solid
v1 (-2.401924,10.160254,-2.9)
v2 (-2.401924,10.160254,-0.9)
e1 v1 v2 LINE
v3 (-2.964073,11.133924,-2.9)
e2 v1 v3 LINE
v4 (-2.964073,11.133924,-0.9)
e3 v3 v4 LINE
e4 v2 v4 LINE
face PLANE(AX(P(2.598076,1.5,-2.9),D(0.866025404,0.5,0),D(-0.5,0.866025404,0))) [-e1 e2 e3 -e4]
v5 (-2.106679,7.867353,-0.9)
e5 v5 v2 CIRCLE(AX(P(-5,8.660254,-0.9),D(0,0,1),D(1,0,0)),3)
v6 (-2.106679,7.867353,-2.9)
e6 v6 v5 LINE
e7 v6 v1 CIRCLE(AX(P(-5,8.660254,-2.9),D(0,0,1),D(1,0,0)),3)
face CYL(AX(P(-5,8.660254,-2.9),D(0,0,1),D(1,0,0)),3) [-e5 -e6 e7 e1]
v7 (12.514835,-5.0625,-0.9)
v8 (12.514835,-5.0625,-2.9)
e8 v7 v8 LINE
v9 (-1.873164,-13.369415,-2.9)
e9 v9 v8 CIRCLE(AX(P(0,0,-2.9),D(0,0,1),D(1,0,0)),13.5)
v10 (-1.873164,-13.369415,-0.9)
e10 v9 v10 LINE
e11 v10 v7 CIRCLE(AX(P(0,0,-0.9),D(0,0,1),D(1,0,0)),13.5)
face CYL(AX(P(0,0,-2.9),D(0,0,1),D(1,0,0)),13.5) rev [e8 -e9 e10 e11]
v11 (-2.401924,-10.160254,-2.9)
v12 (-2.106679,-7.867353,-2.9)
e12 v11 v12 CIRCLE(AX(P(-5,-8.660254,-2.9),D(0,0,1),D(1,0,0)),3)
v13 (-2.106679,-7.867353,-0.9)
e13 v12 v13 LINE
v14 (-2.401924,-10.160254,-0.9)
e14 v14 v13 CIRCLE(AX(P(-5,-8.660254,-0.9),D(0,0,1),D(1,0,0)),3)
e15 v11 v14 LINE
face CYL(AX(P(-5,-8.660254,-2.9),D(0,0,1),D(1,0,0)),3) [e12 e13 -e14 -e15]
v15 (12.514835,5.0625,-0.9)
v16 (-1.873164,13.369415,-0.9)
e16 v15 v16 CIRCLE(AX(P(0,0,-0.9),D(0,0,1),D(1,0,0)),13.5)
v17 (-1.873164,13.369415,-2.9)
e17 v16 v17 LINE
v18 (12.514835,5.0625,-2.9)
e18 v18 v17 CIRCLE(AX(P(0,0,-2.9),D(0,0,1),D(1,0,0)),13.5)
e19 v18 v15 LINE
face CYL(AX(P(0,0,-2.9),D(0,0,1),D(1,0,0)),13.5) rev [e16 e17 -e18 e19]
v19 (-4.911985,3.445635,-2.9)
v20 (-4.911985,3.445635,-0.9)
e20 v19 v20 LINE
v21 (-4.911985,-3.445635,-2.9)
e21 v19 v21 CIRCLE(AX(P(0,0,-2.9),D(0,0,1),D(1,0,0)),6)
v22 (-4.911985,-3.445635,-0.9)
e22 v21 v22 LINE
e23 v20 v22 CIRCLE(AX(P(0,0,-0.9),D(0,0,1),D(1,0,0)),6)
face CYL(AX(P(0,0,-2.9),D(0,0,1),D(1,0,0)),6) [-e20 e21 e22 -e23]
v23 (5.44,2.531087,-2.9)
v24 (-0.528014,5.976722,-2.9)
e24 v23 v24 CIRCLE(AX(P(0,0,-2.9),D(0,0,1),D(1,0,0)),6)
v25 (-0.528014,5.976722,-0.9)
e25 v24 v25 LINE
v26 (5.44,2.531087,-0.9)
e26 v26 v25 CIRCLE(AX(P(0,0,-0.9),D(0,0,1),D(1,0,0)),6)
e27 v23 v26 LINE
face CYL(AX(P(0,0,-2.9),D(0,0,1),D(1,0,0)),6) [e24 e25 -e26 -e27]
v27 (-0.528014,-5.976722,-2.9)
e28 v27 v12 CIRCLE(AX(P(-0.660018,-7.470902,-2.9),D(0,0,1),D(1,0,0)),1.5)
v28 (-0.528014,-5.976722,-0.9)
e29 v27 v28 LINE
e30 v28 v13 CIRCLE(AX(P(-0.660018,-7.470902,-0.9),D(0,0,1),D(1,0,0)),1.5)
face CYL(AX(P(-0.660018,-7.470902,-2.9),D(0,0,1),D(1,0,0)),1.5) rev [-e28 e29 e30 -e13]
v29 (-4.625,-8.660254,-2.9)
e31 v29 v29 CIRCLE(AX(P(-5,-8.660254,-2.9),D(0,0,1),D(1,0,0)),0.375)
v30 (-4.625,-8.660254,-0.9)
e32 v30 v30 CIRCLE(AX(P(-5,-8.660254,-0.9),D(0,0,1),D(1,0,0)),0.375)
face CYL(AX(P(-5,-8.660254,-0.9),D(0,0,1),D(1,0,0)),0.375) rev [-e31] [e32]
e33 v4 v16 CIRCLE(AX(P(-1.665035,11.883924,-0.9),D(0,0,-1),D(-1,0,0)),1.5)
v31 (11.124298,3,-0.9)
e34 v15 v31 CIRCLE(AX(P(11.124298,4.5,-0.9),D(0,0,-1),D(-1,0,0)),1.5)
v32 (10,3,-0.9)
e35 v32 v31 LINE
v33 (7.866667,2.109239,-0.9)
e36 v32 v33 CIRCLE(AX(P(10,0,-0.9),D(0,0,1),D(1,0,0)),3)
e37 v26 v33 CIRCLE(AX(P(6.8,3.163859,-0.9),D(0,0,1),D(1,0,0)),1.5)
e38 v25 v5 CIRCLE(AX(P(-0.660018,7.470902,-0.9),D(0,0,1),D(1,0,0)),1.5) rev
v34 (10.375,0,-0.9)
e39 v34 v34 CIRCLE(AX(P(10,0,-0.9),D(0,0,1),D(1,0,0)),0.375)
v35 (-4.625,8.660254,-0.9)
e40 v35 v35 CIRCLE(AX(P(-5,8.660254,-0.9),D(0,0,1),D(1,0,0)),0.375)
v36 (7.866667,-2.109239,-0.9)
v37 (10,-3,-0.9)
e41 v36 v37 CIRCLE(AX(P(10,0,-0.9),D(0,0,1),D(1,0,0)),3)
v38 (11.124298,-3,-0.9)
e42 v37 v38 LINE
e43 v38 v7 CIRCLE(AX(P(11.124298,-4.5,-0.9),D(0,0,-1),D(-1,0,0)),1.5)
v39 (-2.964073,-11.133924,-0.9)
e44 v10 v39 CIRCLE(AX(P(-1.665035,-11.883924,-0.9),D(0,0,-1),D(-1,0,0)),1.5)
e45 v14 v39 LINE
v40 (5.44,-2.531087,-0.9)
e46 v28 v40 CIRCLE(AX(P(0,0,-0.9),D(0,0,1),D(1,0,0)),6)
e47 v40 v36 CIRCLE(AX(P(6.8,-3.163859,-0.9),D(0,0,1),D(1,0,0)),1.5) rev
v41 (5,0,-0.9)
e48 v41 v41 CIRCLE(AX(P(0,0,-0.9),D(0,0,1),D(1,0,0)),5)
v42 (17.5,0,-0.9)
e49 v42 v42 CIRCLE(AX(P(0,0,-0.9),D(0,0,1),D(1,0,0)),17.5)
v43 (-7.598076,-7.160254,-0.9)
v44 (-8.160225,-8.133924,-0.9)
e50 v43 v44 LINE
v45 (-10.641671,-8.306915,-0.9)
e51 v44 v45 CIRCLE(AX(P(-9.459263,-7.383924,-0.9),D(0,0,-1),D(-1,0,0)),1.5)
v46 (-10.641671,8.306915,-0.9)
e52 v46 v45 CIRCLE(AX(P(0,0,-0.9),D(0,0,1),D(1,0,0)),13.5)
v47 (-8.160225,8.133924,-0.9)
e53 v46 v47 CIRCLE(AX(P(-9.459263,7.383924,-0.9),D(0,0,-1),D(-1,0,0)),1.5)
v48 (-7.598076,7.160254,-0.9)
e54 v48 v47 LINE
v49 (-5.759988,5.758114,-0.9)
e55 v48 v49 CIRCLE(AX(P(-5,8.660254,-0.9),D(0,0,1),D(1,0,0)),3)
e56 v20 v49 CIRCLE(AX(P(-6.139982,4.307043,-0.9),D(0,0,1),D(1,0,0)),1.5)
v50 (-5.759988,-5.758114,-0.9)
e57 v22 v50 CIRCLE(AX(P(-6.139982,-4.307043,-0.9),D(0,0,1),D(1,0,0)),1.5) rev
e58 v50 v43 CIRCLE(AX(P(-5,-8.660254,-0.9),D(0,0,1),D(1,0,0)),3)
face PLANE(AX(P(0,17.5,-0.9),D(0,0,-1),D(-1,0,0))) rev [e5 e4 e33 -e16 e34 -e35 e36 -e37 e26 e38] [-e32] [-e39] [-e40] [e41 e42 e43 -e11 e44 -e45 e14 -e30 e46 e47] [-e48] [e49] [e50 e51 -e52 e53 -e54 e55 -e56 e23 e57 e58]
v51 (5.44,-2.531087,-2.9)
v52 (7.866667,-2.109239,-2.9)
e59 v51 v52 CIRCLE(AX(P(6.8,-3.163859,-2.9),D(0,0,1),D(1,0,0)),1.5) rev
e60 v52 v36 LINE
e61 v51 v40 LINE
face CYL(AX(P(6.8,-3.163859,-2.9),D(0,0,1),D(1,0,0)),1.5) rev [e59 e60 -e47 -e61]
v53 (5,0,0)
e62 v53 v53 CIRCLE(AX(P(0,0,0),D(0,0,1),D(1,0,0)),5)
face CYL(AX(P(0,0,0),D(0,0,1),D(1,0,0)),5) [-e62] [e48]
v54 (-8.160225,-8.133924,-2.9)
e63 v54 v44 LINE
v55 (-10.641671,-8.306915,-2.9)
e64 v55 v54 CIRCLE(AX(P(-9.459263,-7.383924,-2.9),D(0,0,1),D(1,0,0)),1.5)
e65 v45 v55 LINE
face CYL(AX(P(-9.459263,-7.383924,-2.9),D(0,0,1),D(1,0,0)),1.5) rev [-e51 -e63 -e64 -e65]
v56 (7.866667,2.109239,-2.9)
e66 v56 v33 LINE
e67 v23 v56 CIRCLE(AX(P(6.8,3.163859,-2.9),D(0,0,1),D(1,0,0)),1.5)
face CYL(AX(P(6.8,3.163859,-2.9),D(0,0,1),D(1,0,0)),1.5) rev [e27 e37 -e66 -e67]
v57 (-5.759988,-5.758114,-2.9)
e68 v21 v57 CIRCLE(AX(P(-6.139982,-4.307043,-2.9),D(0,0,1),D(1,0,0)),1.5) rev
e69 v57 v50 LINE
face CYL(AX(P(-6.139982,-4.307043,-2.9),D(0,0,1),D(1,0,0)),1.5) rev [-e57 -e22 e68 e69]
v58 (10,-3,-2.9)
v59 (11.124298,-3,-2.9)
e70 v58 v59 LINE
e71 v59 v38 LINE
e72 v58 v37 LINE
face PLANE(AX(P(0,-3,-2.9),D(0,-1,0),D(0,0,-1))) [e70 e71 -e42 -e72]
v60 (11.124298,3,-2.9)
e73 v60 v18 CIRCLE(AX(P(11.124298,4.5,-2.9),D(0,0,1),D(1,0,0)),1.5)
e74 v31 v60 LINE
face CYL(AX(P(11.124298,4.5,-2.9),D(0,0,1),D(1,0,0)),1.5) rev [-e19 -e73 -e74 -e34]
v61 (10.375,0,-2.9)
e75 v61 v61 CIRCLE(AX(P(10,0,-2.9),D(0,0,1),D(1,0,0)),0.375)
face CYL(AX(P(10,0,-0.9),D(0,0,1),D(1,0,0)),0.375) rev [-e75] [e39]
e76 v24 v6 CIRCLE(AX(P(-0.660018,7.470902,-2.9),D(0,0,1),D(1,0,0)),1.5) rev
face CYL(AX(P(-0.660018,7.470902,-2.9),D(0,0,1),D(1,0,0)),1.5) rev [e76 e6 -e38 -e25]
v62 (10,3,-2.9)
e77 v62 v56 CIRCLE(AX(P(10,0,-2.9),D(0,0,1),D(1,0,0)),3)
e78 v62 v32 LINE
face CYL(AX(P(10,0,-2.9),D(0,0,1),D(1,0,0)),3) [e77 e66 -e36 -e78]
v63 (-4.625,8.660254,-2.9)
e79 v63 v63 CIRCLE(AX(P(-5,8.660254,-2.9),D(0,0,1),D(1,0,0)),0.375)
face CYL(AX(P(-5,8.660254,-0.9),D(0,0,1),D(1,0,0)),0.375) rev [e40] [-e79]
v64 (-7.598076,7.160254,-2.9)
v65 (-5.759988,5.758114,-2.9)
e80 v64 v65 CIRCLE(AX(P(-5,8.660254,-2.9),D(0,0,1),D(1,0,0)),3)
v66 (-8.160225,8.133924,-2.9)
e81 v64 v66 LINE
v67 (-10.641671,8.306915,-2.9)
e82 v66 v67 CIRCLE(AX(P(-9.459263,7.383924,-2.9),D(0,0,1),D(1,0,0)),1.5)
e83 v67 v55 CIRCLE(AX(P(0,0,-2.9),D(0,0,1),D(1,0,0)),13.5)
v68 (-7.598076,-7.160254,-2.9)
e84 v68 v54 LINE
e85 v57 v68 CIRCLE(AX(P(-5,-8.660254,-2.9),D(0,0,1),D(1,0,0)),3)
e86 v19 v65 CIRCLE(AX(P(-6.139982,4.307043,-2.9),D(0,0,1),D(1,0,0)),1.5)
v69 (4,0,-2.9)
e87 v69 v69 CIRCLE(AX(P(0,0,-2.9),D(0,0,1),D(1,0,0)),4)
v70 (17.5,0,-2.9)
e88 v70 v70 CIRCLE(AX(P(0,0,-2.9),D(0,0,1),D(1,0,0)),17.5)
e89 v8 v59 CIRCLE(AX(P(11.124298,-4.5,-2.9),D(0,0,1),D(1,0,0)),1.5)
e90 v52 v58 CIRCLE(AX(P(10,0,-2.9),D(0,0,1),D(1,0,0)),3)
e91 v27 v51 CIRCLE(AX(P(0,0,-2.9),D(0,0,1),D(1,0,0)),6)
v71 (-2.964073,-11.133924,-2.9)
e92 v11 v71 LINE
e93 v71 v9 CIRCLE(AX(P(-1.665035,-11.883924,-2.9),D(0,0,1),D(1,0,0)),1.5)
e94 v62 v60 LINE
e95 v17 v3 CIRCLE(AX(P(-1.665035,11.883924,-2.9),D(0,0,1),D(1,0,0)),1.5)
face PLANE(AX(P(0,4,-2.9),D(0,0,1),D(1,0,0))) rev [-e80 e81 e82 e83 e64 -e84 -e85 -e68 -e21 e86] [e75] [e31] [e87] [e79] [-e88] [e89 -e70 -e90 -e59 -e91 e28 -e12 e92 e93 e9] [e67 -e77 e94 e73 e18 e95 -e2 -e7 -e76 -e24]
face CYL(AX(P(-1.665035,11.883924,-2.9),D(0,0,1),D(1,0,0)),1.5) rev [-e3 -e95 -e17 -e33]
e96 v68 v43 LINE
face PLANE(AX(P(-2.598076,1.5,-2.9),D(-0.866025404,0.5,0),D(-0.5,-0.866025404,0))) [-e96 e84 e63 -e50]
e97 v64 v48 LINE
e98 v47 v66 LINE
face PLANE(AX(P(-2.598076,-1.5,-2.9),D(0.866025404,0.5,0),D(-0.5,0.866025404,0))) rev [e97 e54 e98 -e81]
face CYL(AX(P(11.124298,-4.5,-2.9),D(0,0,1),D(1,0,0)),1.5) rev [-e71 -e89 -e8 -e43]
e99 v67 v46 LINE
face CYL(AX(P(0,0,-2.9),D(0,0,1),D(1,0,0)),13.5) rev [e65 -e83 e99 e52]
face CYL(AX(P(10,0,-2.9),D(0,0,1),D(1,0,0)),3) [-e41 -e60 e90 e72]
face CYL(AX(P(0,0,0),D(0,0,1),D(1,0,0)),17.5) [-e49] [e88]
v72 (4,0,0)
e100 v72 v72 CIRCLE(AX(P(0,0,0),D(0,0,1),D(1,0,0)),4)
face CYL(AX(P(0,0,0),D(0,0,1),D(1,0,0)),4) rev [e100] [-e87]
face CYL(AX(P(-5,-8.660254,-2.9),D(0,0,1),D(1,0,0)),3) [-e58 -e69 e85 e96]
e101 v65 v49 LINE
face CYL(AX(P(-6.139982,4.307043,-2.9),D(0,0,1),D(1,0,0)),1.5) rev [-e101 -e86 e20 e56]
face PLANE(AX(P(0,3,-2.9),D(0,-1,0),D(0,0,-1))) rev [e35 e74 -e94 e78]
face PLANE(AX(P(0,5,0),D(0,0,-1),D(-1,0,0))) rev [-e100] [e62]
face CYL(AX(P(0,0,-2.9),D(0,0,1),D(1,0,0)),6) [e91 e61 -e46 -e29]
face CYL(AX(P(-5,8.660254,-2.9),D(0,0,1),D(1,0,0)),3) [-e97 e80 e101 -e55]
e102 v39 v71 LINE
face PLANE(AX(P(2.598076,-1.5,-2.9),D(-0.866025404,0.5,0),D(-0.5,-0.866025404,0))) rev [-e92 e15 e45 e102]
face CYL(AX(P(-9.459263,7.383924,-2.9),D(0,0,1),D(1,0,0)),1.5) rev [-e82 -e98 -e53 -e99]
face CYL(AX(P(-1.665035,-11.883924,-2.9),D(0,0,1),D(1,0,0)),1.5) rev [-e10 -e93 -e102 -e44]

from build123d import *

# Parameters (mm, degrees)
M1X0_25_1_D         = 0.75
CUT_EXTRUDE_START   = -2
CUT_EXTRUDE_1_DEPTH = 2
FILLET_1_R          = 1.5


# Read off the part's stored shape, not the designer's step: ｶｯﾄ - 押し出し1
with BuildPart() as part:
    # ｽｹｯﾁ1 → 回転1 (revolve)
    with BuildSketch(Plane(origin=(0, 0, 0), x_dir=(0, 0, -1), z_dir=(1, 0, 0)), mode=Mode.PRIVATE) as revolve_1_sk:
        Polygon((0, 4), (2.9, 4), (2.9, 17.5), (0.9, 17.5), (0.9, 5), (0, 5), align=None)
    revolve(revolve_1_sk.sketch.rotate(Axis((0, 0, 0), (0, 0, -1)), 90), axis=Axis((0, 0, 0), (0, 0, -1)))

    # M1x0.25 ねじ穴1 (through all)
    with Locations(Plane.XY.offset(-0.9)):
        with Locations((9.999999803, 0), (-5, 8.660254038), (-5.000000098, -8.660253981)):
            Hole(M1X0_25_1_D / 2)

    # ｶｯﾄ - 押し出し1 outline → ｶｯﾄ - 押し出し1 (cut)
    with BuildSketch(Plane.XY.offset(-0.9).offset(CUT_EXTRUDE_START)):
        with BuildLine():
            ThreePointArc((-4.91198547, -3.445634737), (-6, 0), (-4.91198547, 3.445634737))
            ThreePointArc((-4.91198547, 3.445634737), (-4.731685773, 4.823475601), (-5.759987903, 5.758113582))
            ThreePointArc((-5.759987903, 5.758113582), (-6.819518607, 6.275017773), (-7.598076211, 7.160254038))
            Line((-7.598076211, 7.160254038), (-9.179299502, 9.899013115))
            ThreePointArc((-9.179299502, 9.899013115), (-13.5, 8.7e-08), (-9.17929963, -9.899012996))
            Line((-9.17929963, -9.899012996), (-7.59807631, -7.160253868))
            ThreePointArc((-7.59807631, -7.160253868), (-6.819518691, -6.275017592), (-5.759987933, -5.758113538))
            ThreePointArc((-5.759987933, -5.758113538), (-4.731685776, -4.823475609), (-4.91198547, -3.445634737))
        make_face()
        with BuildLine():
            ThreePointArc((5.43999995, -2.531086831), (3, -5.196152423), (-0.52801448, -5.976721569))
            ThreePointArc((-0.52801448, -5.976721569), (-1.811409498, -6.509497859), (-2.106678705, -7.86735258))
            ThreePointArc((-2.106678705, -7.86735258), (-2.024565604, -9.043385134), (-2.401923887, -10.160253868))
            Line((-2.401923887, -10.160253868), (-3.983147246, -12.899013064))
            ThreePointArc((-3.983147246, -12.899013064), (6.749999924, -11.691342995), (13.162446581, -3))
            Line((13.162446581, -3), (9.999999803, -3))
            ThreePointArc((9.999999803, -3), (8.84408395, -2.768367486), (7.866666559, -2.109239026))
            ThreePointArc((7.866666559, -2.109239026), (6.543095269, -1.686022286), (5.43999995, -2.531086831))
        make_face()
        with BuildLine():
            ThreePointArc((-0.52801448, 5.976721569), (3, 5.196152423), (5.43999995, 2.531086831))
            ThreePointArc((5.43999995, 2.531086831), (6.543095269, 1.686022286), (7.866666559, 2.109239026))
            ThreePointArc((7.866666559, 2.109239026), (8.84408395, 2.768367486), (9.999999803, 3))
            Line((9.999999803, 3), (13.162446581, 3))
            ThreePointArc((13.162446581, 3), (6.75, 11.691342951), (-3.983147079, 12.899013115))
            Line((-3.983147079, 12.899013115), (-2.401923789, 10.160254038))
            ThreePointArc((-2.401923789, 10.160254038), (-2.024565497, 9.043385242), (-2.106678823, 7.867352678))
            ThreePointArc((-2.106678823, 7.867352678), (-1.811409518, 6.509497883), (-0.52801448, 5.976721569))
        make_face()
    extrude(amount=CUT_EXTRUDE_1_DEPTH, mode=Mode.SUBTRACT)

    # ﾌｨﾚｯﾄ1
    fillet_1_edges = [part.edges().sort_by_distance(p)[0] for p in [
        (-9.17929963, -9.899012996, -1.9),
        (-9.179299502, 9.899013115, -1.9),
        (-3.983147079, 12.899013115, -1.9),
        (13.162446581, 3, -1.9),
        (13.162446581, -3, -1.9),
        (-3.983147246, -12.899013064, -1.9),
    ]]
    fillet(fillet_1_edges, radius=FILLET_1_R)


solid = part.part
